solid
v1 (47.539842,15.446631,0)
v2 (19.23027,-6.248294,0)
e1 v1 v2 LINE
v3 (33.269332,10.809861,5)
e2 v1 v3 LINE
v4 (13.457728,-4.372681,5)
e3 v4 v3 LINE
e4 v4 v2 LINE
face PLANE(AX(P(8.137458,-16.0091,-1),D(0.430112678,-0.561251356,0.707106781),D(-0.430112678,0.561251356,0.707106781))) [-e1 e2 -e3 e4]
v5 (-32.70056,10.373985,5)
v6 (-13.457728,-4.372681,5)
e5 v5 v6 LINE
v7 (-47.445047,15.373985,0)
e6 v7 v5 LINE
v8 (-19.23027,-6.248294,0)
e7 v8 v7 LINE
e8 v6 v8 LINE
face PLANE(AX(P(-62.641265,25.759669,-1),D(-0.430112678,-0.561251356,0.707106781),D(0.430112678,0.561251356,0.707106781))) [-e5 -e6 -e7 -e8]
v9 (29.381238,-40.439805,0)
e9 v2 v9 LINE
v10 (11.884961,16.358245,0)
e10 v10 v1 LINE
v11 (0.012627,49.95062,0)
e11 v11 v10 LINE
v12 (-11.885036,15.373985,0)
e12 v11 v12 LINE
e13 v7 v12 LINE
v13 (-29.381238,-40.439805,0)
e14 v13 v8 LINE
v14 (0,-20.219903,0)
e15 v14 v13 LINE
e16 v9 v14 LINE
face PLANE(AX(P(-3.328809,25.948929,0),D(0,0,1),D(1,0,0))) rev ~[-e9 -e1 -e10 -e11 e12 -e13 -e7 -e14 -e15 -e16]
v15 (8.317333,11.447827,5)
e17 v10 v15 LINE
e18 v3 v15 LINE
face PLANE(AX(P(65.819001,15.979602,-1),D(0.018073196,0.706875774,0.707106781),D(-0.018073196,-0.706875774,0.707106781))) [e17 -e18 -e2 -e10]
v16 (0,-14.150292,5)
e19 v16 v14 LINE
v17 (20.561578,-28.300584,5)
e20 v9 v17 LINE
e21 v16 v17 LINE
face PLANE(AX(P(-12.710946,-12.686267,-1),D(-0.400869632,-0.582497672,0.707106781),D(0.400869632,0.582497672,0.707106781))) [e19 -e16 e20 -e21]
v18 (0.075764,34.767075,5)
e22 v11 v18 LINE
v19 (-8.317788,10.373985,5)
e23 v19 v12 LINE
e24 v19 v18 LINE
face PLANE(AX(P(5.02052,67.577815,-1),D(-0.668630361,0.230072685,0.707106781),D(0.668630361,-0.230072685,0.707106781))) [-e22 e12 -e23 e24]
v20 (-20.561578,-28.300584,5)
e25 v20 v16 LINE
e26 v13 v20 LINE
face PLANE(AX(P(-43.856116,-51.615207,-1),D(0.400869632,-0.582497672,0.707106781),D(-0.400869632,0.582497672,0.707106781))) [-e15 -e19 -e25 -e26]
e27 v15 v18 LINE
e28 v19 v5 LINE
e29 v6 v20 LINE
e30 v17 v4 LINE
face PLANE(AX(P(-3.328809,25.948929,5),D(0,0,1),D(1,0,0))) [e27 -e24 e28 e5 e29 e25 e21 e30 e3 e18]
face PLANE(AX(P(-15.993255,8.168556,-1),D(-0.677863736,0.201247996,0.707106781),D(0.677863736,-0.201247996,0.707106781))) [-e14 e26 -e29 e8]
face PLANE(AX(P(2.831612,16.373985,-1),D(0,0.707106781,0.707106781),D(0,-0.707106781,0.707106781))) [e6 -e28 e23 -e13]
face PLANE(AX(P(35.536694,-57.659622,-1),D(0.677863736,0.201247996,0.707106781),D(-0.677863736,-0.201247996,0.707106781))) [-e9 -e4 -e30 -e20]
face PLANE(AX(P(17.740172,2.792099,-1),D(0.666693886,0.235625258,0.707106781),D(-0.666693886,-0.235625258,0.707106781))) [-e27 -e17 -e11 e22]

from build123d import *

# Parameters (mm, degrees)
F1_DEPTH      = 5
F2_T4_DEPTH   = 68.6680055615
F2_T9_DEPTH   = 69.5804590238
F2_T14_DEPTH  = 68.6556539851
F2_T19_DEPTH  = 68.6680055615
F2_T24_DEPTH  = 68.6680055615
F2_T29_DEPTH  = 68.6680055615
F2_T34_DEPTH  = 68.6680055615
F2_T39_DEPTH  = 68.6680055615
F2_T44_DEPTH  = 68.6680055615
F2_T49_DEPTH  = 68.6680055615
F2_T55_DEPTH  = 68.6680055615
F2_T59_DEPTH  = 68.6680055615
F2_T66_DEPTH  = 69.5804590238
F2_T70_DEPTH  = 68.6556539851
F2_T77_DEPTH  = 68.6680055615
F2_T81_DEPTH  = 68.6680055615
F2_T88_DEPTH  = 68.6680055615
F2_T92_DEPTH  = 68.6680055615
F2_T99_DEPTH  = 68.6680055615
F2_T103_DEPTH = 68.6680055615


# Not quite as in the source:
# - a fillet or chamfer that OpenCascade refuses, or shapes differently, is made with other operations: its cross-section is extruded or revolved along the edge and cut away or added


with BuildPart() as f1:
    # F0 (on Top) → F1 (new body)
    with BuildSketch(Plane.XY):
        Polygon((0, 0), (0, 52.987328628), (-12.5984860432, 16.3739850326), align=None)
        Polygon((12.5984860432, 17.3403284151), (0, 52.987328628), (0, 0), align=None)
        Polygon((0, 0), (-12.5984860432, 16.3739850326), (-50.3939441727, 16.3739850326), align=None)
        Polygon((50.3939441727, 16.3739850326), (12.5984860432, 17.3403284151), (0, 0), align=None)
        Polygon((20.3847786247, -6.6234160785), (0, 0), (31.1451703259, -42.8676493466), align=None)
        Polygon((0, -21.4338246733), (0, 0), (-31.1451703259, -42.8676493466), align=None)
        Polygon((-20.3847786247, -6.6234160785), (0, 0), (-50.3939441727, 16.3739850326), align=None)
        Polygon((50.3939441727, 16.3739850326), (0, 0), (20.3847786247, -6.6234160785), align=None)
        Polygon((31.1451703259, -42.8676493466), (0, 0), (0, -21.4338246733), align=None)
        Polygon((-31.1451703259, -42.8676493466), (0, 0), (-20.3847786247, -6.6234160785), align=None)
    extrude(amount=F1_DEPTH)

    # F2: chamfer of 6 on 10 edges, made by hand


with BuildPart() as f2_tool2:
    # F2_s3 → F2_t4 (new body)
    with BuildSketch(Plane(origin=(1.0926214012, -3.0915361725, 0), x_dir=(0, 0, 1), z_dir=(-0.3332244354, 0.9428475357, 0))):
        Polygon((-1, 17.6566726657), (5, 11.6566726657), (5, 17.6566726657), align=None)
    extrude(amount=F2_T4_DEPTH)

    split(bisect_by=Plane(origin=(0.451293236, 17.6509043406, 0), x_dir=(0, 0, 1), z_dir=(0.025559359, 0.9996733062, 0)), keep=Keep.TOP)


with BuildPart() as f1_1:
    add(f1.part)

    # F2_t1: cut F2_tool2
    add(f2_tool2.part, mode=Mode.SUBTRACT)


with BuildPart() as f2_tool7:
    # F2_s8 → F2_t9 (new body)
    with BuildSketch(Plane(origin=(21.3229816345, 61.9682119253, 0), x_dir=(0, 0, 1), z_dir=(-0.3253719116, -0.9455861247, 0))):
        Polygon((-1, 17.2405884042), (5, 11.2405884042), (5, 17.2405884042), align=None)
    extrude(amount=F2_T9_DEPTH)

    split(bisect_by=Plane.XZ.offset(-16.3739850326), keep=Keep.BOTTOM)


with BuildPart() as f1_2:
    add(f1_1.part)

    # F2_t6: cut F2_tool7
    add(f2_tool7.part, mode=Mode.SUBTRACT)


with BuildPart() as f2_tool12:
    # F2_s13 → F2_t14 (new body)
    with BuildSketch(Plane.YZ.offset(2.8316118846)):
        Polygon((16.3739850326, -1), (10.3739850326, 5), (16.3739850326, 5), align=None)
    extrude(amount=-F2_T14_DEPTH)

    split(bisect_by=Plane(origin=(-16.3024611761, 5.6096032055, 0), x_dir=(0, 0, 1), z_dir=(-0.9455861247, 0.3253719116, 0)), keep=Keep.TOP)


with BuildPart() as f1_3:
    add(f1_2.part)

    # F2_t11: cut F2_tool12
    add(f2_tool12.part, mode=Mode.SUBTRACT)


with BuildPart() as f2_tool17:
    # F2_s18 → F2_t19 (new body)
    with BuildSketch(Plane(origin=(-51.9012195214, 39.7742870116, 0), x_dir=(0, 0, 1), z_dir=(0.7937292793, -0.6082711823, 0))):
        Polygon((-1, 17.6566726657), (5, 11.6566726657), (5, 17.6566726657), align=None)
    extrude(amount=F2_T19_DEPTH)

    split(bisect_by=Plane(origin=(-16.926464871, 5.0252240345, 0), x_dir=(0, 0, 1), z_dir=(-0.9586440884, 0.2846076455, 0)), keep=Keep.TOP)


with BuildPart() as f1_4:
    add(f1_3.part)

    # F2_t16: cut F2_tool17
    add(f2_tool17.part, mode=Mode.SUBTRACT)


with BuildPart() as f2_tool22:
    # F2_s23 → F2_t24 (new body)
    with BuildSketch(Plane(origin=(0.9332100871, 3.1433320482, 0), x_dir=(0, 0, 1), z_dir=(-0.2846076455, -0.9586440884, 0))):
        Polygon((-1, 17.6566726657), (5, 11.6566726657), (5, 17.6566726657), align=None)
    extrude(amount=F2_T24_DEPTH)

    split(bisect_by=Plane(origin=(-10.7400451584, -14.014618069, 0), x_dir=(0, 0, 1), z_dir=(-0.6082711823, -0.7937292793, 0)), keep=Keep.TOP)


with BuildPart() as f1_5:
    add(f1_4.part)

    # F2_t21: cut F2_tool22
    add(f2_tool22.part, mode=Mode.SUBTRACT)


with BuildPart() as f2_tool27:
    # F2_s28 → F2_t29 (new body)
    with BuildSketch(Plane(origin=(-53.8659537043, -37.0700624038, 0), x_dir=(0, 0, 1), z_dir=(0.8237761079, 0.5669152707, 0))):
        Polygon((-1, 17.6566726657), (5, 11.6566726657), (5, 17.6566726657), align=None)
    extrude(amount=F2_T29_DEPTH)

    split(bisect_by=Plane(origin=(-10.0098373636, -14.5451450862, 0), x_dir=(0, 0, 1), z_dir=(-0.5669152707, -0.8237761079, 0)), keep=Keep.TOP)


with BuildPart() as f1_6:
    add(f1_5.part)

    # F2_t26: cut F2_tool27
    add(f2_tool27.part, mode=Mode.SUBTRACT)


with BuildPart() as f2_tool32:
    # F2_s33 → F2_t34 (new body)
    with BuildSketch(Plane(origin=(-2.7011086511, 1.8588785563, 0), x_dir=(0, 0, 1), z_dir=(0.8237761079, -0.5669152707, 0))):
        Polygon((-1, 17.6566726657), (5, 11.6566726657), (5, 17.6566726657), align=None)
    extrude(amount=F2_T34_DEPTH)

    split(bisect_by=Plane(origin=(10.0098373636, -14.5451450862, 0), x_dir=(0, 0, 1), z_dir=(0.5669152707, -0.8237761079, 0)), keep=Keep.TOP)


with BuildPart() as f1_7:
    add(f1_6.part)

    # F2_t31: cut F2_tool32
    add(f2_tool32.part, mode=Mode.SUBTRACT)


with BuildPart() as f2_tool37:
    # F2_s38 → F2_t39 (new body)
    with BuildSketch(Plane(origin=(18.6102292957, -62.6848455422, 0), x_dir=(0, 0, 1), z_dir=(-0.2846076455, 0.9586440884, 0))):
        Polygon((-1, 17.6566726657), (5, 11.6566726657), (5, 17.6566726657), align=None)
    extrude(amount=F2_T39_DEPTH)

    split(bisect_by=Plane(origin=(10.7400451584, -14.014618069, 0), x_dir=(0, 0, 1), z_dir=(0.6082711823, -0.7937292793, 0)), keep=Keep.TOP)


with BuildPart() as f1_8:
    add(f1_7.part)

    # F2_t36: cut F2_tool37
    add(f2_tool37.part, mode=Mode.SUBTRACT)


with BuildPart() as f2_tool42:
    # F2_s43 → F2_t44 (new body)
    with BuildSketch(Plane(origin=(-2.6025870408, -1.9944819195, 0), x_dir=(0, 0, 1), z_dir=(0.7937292793, 0.6082711823, 0))):
        Polygon((-1, 17.6566726657), (5, 11.6566726657), (5, 17.6566726657), align=None)
    extrude(amount=F2_T44_DEPTH)

    split(bisect_by=Plane(origin=(16.926464871, 5.0252240345, 0), x_dir=(0, 0, 1), z_dir=(0.9586440884, 0.2846076455, 0)), keep=Keep.TOP)


with BuildPart() as f1_9:
    add(f1_8.part)

    # F2_t41: cut F2_tool42
    add(f2_tool42.part, mode=Mode.SUBTRACT)


with BuildPart() as f2_tool47:
    # F2_s48 → F2_t49 (new body)
    with BuildSketch(Plane(origin=(65.3677079475, -1.6713027209, 0), x_dir=(0, 0, 1), z_dir=(-0.9996733062, 0.025559359, 0))):
        Polygon((-1, 17.6566726657), (5, 11.6566726657), (5, 17.6566726657), align=None)
    extrude(amount=F2_T49_DEPTH)

    split(bisect_by=Plane(origin=(16.6475503122, 5.8836347802, 0), x_dir=(0, 0, 1), z_dir=(0.9428475357, 0.3332244354, 0)), keep=Keep.TOP)


with BuildPart() as f1_10:
    add(f1_9.part)

    # F2_t46: cut F2_tool47
    add(f2_tool47.part, mode=Mode.SUBTRACT)


with BuildPart() as f2_tool53:
    # F2_s54 → F2_t55 (new body)
    with BuildSketch(Plane(origin=(1.0926214012, -3.0915361725, 0), x_dir=(0, 0, 1), z_dir=(-0.3332244354, 0.9428475357, 0))):
        Polygon((-1, 17.6566726657), (5, 11.6566726657), (5, 17.6566726657), align=None)
    extrude(amount=F2_T55_DEPTH)

    split(bisect_by=Plane(origin=(0.451293236, 17.6509043406, 0), x_dir=(0, 0, 1), z_dir=(-0.025559359, -0.9996733062, 0)), keep=Keep.TOP)


with BuildPart() as f2_tool57:
    # F2_s58 → F2_t59 (new body)
    with BuildSketch(Plane(origin=(65.3677079475, -1.6713027209, 0), x_dir=(0, 0, 1), z_dir=(-0.9996733062, 0.025559359, 0))):
        Polygon((-1, 17.6566726657), (5, 11.6566726657), (5, 17.6566726657), align=None)
    extrude(amount=F2_T59_DEPTH)

    split(bisect_by=Plane(origin=(16.6475503122, 5.8836347802, 0), x_dir=(0, 0, 1), z_dir=(-0.9428475357, -0.3332244354, 0)), keep=Keep.TOP)


with BuildPart() as f2_tool53_1:
    add(f2_tool53.part)

    # F2_t61: intersect F2_tool57
    add(f2_tool57.part, mode=Mode.INTERSECT)


with BuildPart() as f1_11:
    add(f1_10.part)

    # F2_t51: cut F2_tool53
    add(f2_tool53_1.part, mode=Mode.SUBTRACT)


with BuildPart() as f2_tool64:
    # F2_s65 → F2_t66 (new body)
    with BuildSketch(Plane(origin=(21.3229816345, 61.9682119253, 0), x_dir=(0, 0, 1), z_dir=(-0.3253719116, -0.9455861247, 0))):
        Polygon((-1, 17.2405884042), (5, 11.2405884042), (5, 17.2405884042), align=None)
    extrude(amount=F2_T66_DEPTH)

    split(bisect_by=Plane.XZ.offset(-16.3739850326), keep=Keep.TOP)


with BuildPart() as f2_tool68:
    # F2_s69 → F2_t70 (new body)
    with BuildSketch(Plane.YZ.offset(2.8316118846)):
        Polygon((16.3739850326, -1), (10.3739850326, 5), (16.3739850326, 5), align=None)
    extrude(amount=-F2_T70_DEPTH)

    split(bisect_by=Plane(origin=(-16.3024611761, 5.6096032055, 0), x_dir=(0, 0, 1), z_dir=(0.9455861247, -0.3253719116, 0)), keep=Keep.TOP)


with BuildPart() as f2_tool64_1:
    add(f2_tool64.part)

    # F2_t72: intersect F2_tool68
    add(f2_tool68.part, mode=Mode.INTERSECT)


with BuildPart() as f1_12:
    add(f1_11.part)

    # F2_t62: cut F2_tool64
    add(f2_tool64_1.part, mode=Mode.SUBTRACT)


with BuildPart() as f2_tool75:
    # F2_s76 → F2_t77 (new body)
    with BuildSketch(Plane(origin=(-51.9012195214, 39.7742870116, 0), x_dir=(0, 0, 1), z_dir=(0.7937292793, -0.6082711823, 0))):
        Polygon((-1, 17.6566726657), (5, 11.6566726657), (5, 17.6566726657), align=None)
    extrude(amount=F2_T77_DEPTH)

    split(bisect_by=Plane(origin=(-16.926464871, 5.0252240345, 0), x_dir=(0, 0, 1), z_dir=(0.9586440884, -0.2846076455, 0)), keep=Keep.TOP)


with BuildPart() as f2_tool79:
    # F2_s80 → F2_t81 (new body)
    with BuildSketch(Plane(origin=(0.9332100871, 3.1433320482, 0), x_dir=(0, 0, 1), z_dir=(-0.2846076455, -0.9586440884, 0))):
        Polygon((-1, 17.6566726657), (5, 11.6566726657), (5, 17.6566726657), align=None)
    extrude(amount=F2_T81_DEPTH)

    split(bisect_by=Plane(origin=(-10.7400451584, -14.014618069, 0), x_dir=(0, 0, 1), z_dir=(0.6082711823, 0.7937292793, 0)), keep=Keep.TOP)


with BuildPart() as f2_tool75_1:
    add(f2_tool75.part)

    # F2_t83: intersect F2_tool79
    add(f2_tool79.part, mode=Mode.INTERSECT)


with BuildPart() as f1_13:
    add(f1_12.part)

    # F2_t73: cut F2_tool75
    add(f2_tool75_1.part, mode=Mode.SUBTRACT)


with BuildPart() as f2_tool86:
    # F2_s87 → F2_t88 (new body)
    with BuildSketch(Plane(origin=(-53.8659537043, -37.0700624038, 0), x_dir=(0, 0, 1), z_dir=(0.8237761079, 0.5669152707, 0))):
        Polygon((-1, 17.6566726657), (5, 11.6566726657), (5, 17.6566726657), align=None)
    extrude(amount=F2_T88_DEPTH)

    split(bisect_by=Plane(origin=(-10.0098373636, -14.5451450862, 0), x_dir=(0, 0, 1), z_dir=(0.5669152707, 0.8237761079, 0)), keep=Keep.TOP)


with BuildPart() as f2_tool90:
    # F2_s91 → F2_t92 (new body)
    with BuildSketch(Plane(origin=(-2.7011086511, 1.8588785563, 0), x_dir=(0, 0, 1), z_dir=(0.8237761079, -0.5669152707, 0))):
        Polygon((-1, 17.6566726657), (5, 11.6566726657), (5, 17.6566726657), align=None)
    extrude(amount=F2_T92_DEPTH)

    split(bisect_by=Plane(origin=(10.0098373636, -14.5451450862, 0), x_dir=(0, 0, 1), z_dir=(-0.5669152707, 0.8237761079, 0)), keep=Keep.TOP)


with BuildPart() as f2_tool86_1:
    add(f2_tool86.part)

    # F2_t94: intersect F2_tool90
    add(f2_tool90.part, mode=Mode.INTERSECT)


with BuildPart() as f1_14:
    add(f1_13.part)

    # F2_t84: cut F2_tool86
    add(f2_tool86_1.part, mode=Mode.SUBTRACT)


with BuildPart() as f2_tool97:
    # F2_s98 → F2_t99 (new body)
    with BuildSketch(Plane(origin=(18.6102292957, -62.6848455422, 0), x_dir=(0, 0, 1), z_dir=(-0.2846076455, 0.9586440884, 0))):
        Polygon((-1, 17.6566726657), (5, 11.6566726657), (5, 17.6566726657), align=None)
    extrude(amount=F2_T99_DEPTH)

    split(bisect_by=Plane(origin=(10.7400451584, -14.014618069, 0), x_dir=(0, 0, 1), z_dir=(-0.6082711823, 0.7937292793, 0)), keep=Keep.TOP)


with BuildPart() as f2_tool101:
    # F2_s102 → F2_t103 (new body)
    with BuildSketch(Plane(origin=(-2.6025870408, -1.9944819195, 0), x_dir=(0, 0, 1), z_dir=(0.7937292793, 0.6082711823, 0))):
        Polygon((-1, 17.6566726657), (5, 11.6566726657), (5, 17.6566726657), align=None)
    extrude(amount=F2_T103_DEPTH)

    split(bisect_by=Plane(origin=(16.926464871, 5.0252240345, 0), x_dir=(0, 0, 1), z_dir=(-0.9586440884, -0.2846076455, 0)), keep=Keep.TOP)


with BuildPart() as f2_tool97_1:
    add(f2_tool97.part)

    # F2_t105: intersect F2_tool101
    add(f2_tool101.part, mode=Mode.INTERSECT)


with BuildPart() as f1_15:
    add(f1_14.part)

    # F2_t95: cut F2_tool97
    add(f2_tool97_1.part, mode=Mode.SUBTRACT)


solid = f1_15.part
